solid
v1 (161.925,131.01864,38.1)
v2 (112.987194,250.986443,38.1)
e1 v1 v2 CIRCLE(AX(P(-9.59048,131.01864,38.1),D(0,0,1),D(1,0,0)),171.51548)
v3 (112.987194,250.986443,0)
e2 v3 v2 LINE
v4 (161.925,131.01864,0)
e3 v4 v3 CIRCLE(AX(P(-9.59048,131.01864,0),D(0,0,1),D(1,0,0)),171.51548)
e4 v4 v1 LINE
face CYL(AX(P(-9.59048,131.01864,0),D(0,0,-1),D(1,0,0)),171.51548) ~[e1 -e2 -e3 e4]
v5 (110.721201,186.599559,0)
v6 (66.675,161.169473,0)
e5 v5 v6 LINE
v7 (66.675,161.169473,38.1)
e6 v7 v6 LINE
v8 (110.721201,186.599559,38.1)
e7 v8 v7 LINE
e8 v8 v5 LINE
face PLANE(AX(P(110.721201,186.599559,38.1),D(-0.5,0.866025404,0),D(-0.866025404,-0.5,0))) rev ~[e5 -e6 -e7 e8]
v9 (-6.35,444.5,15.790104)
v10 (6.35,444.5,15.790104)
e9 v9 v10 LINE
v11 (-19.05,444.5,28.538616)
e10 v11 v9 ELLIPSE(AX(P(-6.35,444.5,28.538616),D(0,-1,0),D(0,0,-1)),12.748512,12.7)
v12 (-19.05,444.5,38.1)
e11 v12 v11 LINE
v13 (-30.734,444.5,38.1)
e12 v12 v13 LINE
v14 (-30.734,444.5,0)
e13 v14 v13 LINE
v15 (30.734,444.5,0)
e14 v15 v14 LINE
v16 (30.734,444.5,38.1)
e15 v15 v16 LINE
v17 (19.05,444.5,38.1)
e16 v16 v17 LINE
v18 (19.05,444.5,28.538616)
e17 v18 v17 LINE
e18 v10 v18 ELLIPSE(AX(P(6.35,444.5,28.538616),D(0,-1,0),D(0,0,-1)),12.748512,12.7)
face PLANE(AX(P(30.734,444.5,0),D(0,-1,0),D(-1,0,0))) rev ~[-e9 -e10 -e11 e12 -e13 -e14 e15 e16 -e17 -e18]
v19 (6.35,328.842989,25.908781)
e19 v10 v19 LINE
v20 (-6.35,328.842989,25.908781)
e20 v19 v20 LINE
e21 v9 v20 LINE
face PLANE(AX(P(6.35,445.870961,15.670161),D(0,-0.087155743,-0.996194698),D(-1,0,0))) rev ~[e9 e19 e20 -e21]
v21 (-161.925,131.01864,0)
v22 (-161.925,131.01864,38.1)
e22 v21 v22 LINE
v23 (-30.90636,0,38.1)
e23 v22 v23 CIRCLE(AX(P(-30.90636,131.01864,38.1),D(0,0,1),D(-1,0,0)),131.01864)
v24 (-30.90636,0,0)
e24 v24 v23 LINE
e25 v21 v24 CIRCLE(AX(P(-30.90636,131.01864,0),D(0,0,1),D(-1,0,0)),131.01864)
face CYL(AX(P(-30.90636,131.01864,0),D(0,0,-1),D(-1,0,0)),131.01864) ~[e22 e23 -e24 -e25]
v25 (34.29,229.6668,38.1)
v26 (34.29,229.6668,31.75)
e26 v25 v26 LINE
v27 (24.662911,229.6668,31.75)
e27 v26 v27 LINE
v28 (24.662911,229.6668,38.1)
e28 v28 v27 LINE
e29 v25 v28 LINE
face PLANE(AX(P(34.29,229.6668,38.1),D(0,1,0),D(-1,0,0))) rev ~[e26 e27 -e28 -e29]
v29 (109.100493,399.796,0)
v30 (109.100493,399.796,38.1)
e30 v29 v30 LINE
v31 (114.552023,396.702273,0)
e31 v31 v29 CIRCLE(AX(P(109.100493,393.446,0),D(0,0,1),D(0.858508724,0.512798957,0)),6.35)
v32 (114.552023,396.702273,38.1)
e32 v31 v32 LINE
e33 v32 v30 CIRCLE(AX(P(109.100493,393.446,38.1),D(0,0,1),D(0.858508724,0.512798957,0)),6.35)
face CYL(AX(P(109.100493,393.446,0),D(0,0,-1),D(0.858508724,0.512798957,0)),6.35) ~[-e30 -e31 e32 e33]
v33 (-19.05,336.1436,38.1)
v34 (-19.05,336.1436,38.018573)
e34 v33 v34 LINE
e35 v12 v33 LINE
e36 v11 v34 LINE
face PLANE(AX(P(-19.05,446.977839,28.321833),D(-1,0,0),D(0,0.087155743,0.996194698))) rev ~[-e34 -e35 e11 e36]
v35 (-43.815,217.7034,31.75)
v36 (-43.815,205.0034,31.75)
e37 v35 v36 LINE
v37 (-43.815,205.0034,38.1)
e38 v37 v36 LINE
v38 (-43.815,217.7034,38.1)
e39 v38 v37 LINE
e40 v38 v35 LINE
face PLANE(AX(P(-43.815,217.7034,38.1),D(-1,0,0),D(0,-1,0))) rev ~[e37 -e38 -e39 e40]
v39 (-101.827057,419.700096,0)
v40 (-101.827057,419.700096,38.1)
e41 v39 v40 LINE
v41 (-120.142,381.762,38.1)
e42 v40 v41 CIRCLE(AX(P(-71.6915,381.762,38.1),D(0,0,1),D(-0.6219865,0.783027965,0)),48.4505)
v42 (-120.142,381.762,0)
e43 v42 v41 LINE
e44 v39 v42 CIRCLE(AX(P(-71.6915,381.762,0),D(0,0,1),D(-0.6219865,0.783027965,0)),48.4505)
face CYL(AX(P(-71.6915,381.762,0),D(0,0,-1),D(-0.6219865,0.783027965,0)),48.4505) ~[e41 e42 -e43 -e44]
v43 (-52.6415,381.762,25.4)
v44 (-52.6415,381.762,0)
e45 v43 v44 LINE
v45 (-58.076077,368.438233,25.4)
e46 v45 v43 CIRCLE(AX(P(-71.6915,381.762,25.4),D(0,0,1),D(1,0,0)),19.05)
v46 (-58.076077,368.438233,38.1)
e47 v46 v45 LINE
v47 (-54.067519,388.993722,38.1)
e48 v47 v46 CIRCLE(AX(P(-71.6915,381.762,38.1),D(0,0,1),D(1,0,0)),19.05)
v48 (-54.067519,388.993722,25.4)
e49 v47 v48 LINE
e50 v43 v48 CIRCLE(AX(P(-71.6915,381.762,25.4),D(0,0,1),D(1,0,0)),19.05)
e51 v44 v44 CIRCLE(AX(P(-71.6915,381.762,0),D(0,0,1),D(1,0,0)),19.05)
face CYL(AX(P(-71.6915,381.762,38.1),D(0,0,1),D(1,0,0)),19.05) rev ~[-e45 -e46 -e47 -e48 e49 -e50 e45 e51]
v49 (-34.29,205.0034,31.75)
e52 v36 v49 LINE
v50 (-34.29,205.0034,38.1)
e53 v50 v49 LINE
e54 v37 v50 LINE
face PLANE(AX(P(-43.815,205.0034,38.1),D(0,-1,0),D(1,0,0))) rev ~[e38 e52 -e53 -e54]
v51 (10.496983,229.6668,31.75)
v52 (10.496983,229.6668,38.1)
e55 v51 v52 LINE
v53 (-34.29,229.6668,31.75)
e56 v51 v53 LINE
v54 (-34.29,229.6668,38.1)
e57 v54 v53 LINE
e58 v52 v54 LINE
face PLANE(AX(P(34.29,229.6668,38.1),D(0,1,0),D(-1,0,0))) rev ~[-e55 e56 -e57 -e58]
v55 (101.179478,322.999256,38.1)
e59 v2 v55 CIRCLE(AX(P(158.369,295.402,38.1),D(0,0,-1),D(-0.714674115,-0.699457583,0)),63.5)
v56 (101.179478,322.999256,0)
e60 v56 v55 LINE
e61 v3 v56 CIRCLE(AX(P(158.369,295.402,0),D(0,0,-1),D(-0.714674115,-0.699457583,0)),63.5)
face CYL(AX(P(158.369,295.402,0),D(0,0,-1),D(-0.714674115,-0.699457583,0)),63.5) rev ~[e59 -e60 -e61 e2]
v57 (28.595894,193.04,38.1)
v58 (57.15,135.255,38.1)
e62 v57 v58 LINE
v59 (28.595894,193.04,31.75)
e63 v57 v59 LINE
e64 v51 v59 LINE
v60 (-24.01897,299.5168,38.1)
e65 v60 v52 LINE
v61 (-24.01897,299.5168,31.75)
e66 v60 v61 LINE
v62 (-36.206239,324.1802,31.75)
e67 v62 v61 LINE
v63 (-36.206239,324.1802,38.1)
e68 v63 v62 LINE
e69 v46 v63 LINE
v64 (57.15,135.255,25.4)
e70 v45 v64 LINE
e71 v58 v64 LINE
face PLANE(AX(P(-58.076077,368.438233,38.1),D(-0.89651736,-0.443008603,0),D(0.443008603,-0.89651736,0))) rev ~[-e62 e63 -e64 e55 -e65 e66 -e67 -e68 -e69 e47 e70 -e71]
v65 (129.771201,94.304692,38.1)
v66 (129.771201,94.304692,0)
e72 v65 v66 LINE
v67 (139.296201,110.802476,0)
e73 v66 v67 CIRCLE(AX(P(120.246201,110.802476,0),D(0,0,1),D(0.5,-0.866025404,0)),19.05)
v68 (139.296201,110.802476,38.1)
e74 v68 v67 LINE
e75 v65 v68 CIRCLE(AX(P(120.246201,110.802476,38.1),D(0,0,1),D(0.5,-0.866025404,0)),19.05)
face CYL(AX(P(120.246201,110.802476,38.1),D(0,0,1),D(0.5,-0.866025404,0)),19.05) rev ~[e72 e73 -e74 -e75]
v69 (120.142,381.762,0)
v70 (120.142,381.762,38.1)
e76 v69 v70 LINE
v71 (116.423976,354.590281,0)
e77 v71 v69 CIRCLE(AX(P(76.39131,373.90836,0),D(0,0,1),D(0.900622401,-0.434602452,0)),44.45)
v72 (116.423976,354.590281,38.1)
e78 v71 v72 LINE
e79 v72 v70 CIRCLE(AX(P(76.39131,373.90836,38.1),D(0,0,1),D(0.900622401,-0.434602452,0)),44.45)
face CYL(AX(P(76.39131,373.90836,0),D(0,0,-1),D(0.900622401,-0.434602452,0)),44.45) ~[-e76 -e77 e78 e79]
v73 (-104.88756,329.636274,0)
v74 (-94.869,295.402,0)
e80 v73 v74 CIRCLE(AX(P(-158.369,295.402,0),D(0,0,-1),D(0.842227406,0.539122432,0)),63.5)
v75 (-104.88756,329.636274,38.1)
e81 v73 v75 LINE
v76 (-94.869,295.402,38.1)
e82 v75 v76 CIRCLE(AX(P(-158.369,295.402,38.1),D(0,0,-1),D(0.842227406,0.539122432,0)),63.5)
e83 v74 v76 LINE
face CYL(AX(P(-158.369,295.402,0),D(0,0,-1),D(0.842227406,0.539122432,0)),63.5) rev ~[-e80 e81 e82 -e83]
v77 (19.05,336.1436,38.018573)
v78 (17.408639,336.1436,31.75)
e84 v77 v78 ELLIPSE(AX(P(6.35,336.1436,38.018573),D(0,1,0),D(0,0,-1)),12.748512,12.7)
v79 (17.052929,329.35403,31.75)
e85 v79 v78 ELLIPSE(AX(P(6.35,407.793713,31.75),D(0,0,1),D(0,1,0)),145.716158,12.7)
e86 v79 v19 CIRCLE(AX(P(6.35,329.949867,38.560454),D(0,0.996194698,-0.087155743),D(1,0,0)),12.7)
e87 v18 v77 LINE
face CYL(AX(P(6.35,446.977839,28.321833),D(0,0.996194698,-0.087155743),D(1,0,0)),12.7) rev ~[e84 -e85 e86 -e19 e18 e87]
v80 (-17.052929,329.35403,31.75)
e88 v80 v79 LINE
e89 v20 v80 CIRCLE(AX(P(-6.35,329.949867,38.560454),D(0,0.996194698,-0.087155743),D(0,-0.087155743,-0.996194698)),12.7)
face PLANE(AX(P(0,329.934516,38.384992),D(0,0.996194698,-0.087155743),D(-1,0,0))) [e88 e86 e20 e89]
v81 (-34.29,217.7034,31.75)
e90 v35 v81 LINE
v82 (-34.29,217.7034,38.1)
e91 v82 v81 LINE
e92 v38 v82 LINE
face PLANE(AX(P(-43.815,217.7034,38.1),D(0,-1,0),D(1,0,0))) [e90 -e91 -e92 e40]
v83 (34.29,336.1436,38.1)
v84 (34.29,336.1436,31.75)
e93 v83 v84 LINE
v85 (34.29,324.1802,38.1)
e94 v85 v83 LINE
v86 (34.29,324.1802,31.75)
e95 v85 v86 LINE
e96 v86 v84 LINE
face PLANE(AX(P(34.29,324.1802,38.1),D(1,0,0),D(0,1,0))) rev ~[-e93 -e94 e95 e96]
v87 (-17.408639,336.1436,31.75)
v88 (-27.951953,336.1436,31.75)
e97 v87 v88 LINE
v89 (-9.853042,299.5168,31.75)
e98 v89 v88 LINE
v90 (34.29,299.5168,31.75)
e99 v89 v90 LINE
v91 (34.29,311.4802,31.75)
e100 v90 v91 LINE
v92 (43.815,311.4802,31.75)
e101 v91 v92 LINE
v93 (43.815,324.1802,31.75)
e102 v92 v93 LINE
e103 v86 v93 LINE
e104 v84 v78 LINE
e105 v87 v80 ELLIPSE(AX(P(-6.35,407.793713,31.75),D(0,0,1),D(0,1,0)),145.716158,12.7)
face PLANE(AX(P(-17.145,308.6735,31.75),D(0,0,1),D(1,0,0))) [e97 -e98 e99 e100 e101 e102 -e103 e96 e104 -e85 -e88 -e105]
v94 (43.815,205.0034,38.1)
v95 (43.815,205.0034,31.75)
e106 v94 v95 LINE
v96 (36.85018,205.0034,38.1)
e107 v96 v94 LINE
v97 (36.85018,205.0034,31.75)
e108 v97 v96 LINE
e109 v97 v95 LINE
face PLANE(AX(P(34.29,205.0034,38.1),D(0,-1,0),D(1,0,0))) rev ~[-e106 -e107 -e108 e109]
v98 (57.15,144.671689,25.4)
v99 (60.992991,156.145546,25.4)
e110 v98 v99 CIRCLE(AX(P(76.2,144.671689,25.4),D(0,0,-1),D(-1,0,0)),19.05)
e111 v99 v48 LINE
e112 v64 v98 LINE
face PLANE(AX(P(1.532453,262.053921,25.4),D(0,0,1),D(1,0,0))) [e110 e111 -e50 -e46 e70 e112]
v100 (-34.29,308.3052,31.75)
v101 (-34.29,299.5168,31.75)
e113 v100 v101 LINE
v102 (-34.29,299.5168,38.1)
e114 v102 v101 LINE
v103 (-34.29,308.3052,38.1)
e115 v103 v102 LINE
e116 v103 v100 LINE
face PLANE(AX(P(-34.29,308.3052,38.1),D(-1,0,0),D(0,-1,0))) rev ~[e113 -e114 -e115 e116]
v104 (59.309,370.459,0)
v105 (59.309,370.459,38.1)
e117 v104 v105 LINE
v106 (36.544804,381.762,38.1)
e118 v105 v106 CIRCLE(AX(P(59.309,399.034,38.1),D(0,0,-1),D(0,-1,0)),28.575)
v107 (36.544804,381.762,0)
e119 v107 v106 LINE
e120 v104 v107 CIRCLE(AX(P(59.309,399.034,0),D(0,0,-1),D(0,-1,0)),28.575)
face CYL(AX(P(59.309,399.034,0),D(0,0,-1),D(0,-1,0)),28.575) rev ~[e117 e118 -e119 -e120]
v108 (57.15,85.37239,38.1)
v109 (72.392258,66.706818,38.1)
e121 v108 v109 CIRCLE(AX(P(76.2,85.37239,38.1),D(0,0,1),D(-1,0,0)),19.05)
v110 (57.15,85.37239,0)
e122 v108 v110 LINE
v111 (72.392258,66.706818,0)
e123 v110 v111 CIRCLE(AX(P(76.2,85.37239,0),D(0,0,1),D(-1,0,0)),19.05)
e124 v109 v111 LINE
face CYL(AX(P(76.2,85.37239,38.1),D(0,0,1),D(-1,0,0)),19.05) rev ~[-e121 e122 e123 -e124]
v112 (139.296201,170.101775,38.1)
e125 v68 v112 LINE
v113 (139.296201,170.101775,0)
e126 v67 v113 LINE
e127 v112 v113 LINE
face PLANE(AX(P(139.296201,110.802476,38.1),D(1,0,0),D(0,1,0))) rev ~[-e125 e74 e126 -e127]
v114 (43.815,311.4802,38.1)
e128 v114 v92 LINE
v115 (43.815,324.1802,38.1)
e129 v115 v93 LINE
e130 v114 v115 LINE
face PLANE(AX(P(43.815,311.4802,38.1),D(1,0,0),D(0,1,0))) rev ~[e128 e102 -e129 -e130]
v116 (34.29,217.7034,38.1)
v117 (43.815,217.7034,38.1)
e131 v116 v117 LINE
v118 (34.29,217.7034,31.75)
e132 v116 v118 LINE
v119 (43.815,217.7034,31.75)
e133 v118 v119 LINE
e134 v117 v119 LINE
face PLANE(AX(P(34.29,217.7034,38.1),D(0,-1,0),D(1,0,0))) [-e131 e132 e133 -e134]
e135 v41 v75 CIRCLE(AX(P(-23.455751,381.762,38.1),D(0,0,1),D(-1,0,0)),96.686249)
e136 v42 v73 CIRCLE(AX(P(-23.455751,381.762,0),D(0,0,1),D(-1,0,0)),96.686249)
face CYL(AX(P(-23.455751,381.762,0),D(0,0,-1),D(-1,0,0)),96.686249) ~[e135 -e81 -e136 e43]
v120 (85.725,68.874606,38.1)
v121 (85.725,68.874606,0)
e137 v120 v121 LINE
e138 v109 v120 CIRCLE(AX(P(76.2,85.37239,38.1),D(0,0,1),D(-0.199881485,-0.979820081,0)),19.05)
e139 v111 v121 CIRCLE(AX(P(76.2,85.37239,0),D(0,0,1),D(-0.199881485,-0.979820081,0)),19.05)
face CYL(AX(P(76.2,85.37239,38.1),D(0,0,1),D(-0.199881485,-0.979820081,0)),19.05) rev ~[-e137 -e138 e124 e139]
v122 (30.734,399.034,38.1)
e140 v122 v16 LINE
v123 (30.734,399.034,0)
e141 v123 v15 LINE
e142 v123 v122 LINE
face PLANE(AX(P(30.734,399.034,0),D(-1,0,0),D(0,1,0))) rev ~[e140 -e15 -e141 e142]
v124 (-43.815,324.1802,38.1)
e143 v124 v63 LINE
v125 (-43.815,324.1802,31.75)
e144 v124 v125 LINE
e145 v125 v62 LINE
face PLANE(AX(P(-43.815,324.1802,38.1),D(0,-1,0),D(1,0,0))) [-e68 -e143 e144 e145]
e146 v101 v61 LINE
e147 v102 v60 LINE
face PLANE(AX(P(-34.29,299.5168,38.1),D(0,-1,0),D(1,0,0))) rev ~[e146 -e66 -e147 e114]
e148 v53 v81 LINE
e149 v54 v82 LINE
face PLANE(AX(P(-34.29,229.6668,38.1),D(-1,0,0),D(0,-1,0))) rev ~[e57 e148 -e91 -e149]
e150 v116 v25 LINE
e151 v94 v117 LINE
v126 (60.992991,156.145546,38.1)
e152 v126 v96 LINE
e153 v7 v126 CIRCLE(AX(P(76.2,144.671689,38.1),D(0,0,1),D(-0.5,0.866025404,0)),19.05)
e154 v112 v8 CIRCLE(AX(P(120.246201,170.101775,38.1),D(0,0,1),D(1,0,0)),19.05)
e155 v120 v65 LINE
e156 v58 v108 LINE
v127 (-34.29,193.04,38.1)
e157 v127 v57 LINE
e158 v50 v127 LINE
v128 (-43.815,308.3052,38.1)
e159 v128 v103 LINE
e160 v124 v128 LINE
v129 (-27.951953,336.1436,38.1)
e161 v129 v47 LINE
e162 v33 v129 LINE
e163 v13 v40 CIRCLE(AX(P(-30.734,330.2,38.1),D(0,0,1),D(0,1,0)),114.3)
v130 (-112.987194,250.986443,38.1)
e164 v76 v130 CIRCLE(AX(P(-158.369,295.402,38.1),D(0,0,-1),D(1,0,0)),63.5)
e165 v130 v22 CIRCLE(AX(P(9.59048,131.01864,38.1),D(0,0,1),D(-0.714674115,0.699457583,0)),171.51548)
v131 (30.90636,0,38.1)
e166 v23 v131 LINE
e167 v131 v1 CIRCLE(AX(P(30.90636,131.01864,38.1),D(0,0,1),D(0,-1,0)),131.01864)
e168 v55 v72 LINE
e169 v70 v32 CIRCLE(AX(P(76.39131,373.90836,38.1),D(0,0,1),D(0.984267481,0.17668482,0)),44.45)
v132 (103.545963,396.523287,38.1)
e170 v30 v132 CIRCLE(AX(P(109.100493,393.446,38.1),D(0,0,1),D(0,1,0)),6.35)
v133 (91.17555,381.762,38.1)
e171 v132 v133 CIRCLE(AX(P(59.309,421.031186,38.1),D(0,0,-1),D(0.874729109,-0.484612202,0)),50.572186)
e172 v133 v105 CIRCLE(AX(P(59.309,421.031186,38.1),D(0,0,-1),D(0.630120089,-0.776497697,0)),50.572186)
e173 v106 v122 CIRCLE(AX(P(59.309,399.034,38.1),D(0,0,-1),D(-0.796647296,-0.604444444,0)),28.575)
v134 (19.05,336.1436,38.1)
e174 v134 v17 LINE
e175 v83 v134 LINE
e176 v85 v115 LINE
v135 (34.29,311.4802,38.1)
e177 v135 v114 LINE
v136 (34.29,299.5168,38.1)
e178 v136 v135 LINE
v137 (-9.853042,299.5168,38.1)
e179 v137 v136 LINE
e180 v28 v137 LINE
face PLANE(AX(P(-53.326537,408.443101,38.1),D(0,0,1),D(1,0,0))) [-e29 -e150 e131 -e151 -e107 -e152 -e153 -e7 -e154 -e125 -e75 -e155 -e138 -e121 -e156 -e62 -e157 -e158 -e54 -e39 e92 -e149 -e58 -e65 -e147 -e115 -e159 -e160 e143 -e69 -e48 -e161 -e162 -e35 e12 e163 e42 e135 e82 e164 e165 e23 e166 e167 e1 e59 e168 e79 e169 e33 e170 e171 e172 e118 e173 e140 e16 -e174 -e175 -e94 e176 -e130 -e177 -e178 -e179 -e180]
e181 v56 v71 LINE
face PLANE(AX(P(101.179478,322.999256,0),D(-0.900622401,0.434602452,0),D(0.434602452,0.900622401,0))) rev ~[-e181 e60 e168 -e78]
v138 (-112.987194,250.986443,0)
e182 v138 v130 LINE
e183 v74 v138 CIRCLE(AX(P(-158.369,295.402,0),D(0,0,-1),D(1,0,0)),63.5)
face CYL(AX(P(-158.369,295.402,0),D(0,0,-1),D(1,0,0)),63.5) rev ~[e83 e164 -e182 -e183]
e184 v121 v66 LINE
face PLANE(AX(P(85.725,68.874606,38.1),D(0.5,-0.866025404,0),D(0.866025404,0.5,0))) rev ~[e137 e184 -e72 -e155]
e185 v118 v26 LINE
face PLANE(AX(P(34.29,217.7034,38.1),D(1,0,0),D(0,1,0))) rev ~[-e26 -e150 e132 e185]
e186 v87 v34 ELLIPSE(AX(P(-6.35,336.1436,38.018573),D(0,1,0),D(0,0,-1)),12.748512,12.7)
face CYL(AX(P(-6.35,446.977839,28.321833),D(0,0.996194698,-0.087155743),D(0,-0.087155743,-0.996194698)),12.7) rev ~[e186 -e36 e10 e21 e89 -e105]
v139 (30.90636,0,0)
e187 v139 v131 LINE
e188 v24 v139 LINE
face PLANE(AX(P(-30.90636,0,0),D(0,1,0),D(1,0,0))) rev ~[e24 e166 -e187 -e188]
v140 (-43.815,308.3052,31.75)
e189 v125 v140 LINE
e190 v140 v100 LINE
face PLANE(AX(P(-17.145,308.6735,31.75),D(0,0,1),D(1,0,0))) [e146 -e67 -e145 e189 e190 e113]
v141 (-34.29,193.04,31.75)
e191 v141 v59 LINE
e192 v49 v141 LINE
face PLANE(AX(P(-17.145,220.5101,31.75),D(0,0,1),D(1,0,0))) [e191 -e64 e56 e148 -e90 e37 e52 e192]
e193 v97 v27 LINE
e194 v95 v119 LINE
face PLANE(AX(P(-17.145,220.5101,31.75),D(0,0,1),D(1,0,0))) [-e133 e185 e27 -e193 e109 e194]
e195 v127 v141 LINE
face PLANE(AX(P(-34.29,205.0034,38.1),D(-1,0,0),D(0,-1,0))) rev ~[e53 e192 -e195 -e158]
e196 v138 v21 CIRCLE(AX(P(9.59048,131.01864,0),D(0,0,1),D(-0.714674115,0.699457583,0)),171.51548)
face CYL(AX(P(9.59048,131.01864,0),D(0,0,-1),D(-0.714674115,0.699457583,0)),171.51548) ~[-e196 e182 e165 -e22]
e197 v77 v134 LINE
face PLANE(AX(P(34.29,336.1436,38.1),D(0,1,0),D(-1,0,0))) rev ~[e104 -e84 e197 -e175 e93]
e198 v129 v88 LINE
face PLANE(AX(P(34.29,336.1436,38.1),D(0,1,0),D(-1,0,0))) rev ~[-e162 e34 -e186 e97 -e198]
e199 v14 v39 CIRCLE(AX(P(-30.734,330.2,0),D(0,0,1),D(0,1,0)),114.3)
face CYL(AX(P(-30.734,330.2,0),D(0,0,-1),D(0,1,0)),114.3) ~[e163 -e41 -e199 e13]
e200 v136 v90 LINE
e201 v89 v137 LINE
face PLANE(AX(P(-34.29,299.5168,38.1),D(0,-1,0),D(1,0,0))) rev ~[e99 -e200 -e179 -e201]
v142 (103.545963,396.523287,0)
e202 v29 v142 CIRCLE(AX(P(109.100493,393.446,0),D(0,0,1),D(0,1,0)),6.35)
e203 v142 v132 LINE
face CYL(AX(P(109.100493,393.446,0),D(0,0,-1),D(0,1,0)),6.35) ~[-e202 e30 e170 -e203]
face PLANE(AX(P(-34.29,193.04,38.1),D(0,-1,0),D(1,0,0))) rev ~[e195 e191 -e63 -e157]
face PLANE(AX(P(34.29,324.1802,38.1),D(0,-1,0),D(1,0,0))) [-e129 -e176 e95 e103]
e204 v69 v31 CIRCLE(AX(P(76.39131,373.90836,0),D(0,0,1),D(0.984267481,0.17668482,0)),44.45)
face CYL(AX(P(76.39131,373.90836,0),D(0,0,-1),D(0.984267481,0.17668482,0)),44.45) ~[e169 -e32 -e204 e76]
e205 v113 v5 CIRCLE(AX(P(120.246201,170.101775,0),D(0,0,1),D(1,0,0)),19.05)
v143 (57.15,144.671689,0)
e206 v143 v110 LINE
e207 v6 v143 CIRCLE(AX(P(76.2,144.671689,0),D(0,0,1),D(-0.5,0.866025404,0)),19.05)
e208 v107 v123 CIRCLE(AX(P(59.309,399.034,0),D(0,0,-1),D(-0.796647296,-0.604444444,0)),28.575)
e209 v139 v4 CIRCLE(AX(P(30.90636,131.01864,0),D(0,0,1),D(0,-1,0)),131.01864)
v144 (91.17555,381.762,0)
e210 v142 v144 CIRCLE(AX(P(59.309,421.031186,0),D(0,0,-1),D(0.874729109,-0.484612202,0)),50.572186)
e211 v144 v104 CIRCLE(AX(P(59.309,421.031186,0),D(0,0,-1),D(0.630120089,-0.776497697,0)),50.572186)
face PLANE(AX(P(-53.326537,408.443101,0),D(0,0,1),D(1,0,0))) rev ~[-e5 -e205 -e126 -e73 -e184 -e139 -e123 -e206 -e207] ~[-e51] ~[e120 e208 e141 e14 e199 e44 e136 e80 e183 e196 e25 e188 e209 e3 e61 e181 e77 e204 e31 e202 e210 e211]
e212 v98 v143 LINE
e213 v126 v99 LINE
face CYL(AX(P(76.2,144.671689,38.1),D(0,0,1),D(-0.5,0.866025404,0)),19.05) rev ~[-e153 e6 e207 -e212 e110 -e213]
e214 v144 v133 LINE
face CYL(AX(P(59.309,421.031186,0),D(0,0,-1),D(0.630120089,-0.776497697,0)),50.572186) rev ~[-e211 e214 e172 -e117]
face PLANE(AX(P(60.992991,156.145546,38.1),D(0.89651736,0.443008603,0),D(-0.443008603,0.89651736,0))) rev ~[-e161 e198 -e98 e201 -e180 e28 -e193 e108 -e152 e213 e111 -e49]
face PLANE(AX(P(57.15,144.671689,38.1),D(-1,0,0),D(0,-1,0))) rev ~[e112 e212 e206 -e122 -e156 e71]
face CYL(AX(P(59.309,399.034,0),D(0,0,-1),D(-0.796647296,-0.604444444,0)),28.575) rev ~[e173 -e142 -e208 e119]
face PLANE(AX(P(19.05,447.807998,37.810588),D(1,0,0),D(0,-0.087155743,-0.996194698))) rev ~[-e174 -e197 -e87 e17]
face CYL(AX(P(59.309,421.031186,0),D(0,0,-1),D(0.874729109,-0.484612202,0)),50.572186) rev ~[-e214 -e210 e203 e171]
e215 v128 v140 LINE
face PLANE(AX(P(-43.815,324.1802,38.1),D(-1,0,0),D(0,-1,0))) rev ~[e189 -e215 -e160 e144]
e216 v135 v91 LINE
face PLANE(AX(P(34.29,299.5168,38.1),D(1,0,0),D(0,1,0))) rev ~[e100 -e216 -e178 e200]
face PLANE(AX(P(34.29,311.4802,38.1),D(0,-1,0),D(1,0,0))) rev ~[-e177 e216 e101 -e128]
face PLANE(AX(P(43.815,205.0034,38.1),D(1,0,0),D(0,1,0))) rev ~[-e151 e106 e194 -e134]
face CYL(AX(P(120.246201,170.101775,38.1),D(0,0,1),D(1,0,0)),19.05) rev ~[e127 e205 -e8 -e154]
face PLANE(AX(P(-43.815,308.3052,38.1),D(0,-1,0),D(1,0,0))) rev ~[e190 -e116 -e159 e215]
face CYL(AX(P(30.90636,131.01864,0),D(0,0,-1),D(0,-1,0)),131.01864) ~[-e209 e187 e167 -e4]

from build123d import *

# Parameters (mm, degrees)
F2_DEPTH  = 38.1
F4_R      = 19.05
F5_DEPTH  = 38.101
F11_DEPTH = 117.475
F12_W     = 9.525
F12_H     = 6.35
F13_DEPTH = 6.35
F15_DEPTH = 12.7


# Not quite as in the source:
# - a feature of the source that left no trace in its solid (it failed there, or was rolled back) is left out


with BuildPart() as f2:
    # F1 (on Top) → F2 (new body)
    with BuildSketch(Plane.XY):
        with BuildLine():
            Line((-120.142, 381.762), (0, 381.762))
            Line((0, 381.762), (0, 444.5))
            Line((0, 444.5), (-30.734, 444.5))
            ThreePointArc((-30.734, 444.5), (-68.3812374672, 438.1220807393), (-101.8270568949, 419.700096432))
            ThreePointArc((-101.8270568949, 419.700096432), (-115.3236770577, 402.8258096141), (-120.142, 381.762))
        make_face()
        with BuildLine():
            Line((0, 444.5), (0, 381.762))
            Line((0, 381.762), (36.5448035283, 381.762))
            ThreePointArc((36.5448035283, 381.762), (32.2256329717, 389.9223670283), (30.734, 399.034))
            Line((30.734, 399.034), (30.734, 444.5))
            Line((30.734, 444.5), (0, 444.5))
        make_face()
        with BuildLine():
            Line((0, 381.762), (0, 295.402))
            Line((0, 295.402), (94.869, 295.402))
            ThreePointArc((94.869, 295.402), (96.466719449, 309.5567752573), (101.1794775617, 322.9992557201))
            Line((101.1794775617, 322.9992557201), (116.4239761752, 354.5902807248))
            ThreePointArc((116.4239761752, 354.5902807248), (120.430931673, 367.882227955), (120.142, 381.762))
            Line((120.142, 381.762), (91.175550227, 381.762))
            ThreePointArc((91.175550227, 381.762), (76.2148779155, 373.3684407202), (59.309, 370.459))
            ThreePointArc((59.309, 370.459), (46.6010649789, 373.440270055), (36.5448035283, 381.762))
            Line((36.5448035283, 381.762), (0, 381.762))
        make_face()
        with BuildLine():
            ThreePointArc((103.5459630182, 396.5232874828), (98.0699350262, 388.5483304334), (91.175550227, 381.762))
            Line((91.175550227, 381.762), (120.142, 381.762))
            ThreePointArc((120.142, 381.762), (118.0226976621, 389.4849479409), (114.552023257, 396.7022733785))
            ThreePointArc((114.552023257, 396.7022733785), (112.2345927331, 398.9686730826), (109.1004928586, 399.796))
            ThreePointArc((109.1004928586, 399.796), (105.8770068198, 398.9169814255), (103.5459630182, 396.5232874828))
        make_face()
        with BuildLine():
            Line((94.869, 295.402), (0, 295.402))
            Line((0, 295.402), (0, 0))
            Line((0, 0), (30.906359714, 0))
            ThreePointArc((30.906359714, 0), (123.5505287221, 38.3744712779), (161.925, 131.018640286))
            ThreePointArc((161.925, 131.018640286), (149.2199863218, 195.80132063), (112.9871937272, 250.9864434976))
            ThreePointArc((112.9871937272, 250.9864434976), (99.5727641582, 271.4175748279), (94.869, 295.402))
        make_face()
        with BuildLine():
            Line((0, 295.402), (-94.869, 295.402))
            ThreePointArc((-94.869, 295.402), (-99.5727641582, 271.4175748279), (-112.9871937272, 250.9864434976))
            ThreePointArc((-112.9871937272, 250.9864434976), (-149.2199863218, 195.80132063), (-161.925, 131.018640286))
            ThreePointArc((-161.925, 131.018640286), (-123.5505287221, 38.3744712779), (-30.906359714, 0))
            Line((-30.906359714, 0), (0, 0))
            Line((0, 0), (0, 295.402))
        make_face()
        with BuildLine():
            ThreePointArc((-104.887559724, 329.6362744337), (-97.4250853837, 313.2370573657), (-94.869, 295.402))
            Line((-94.869, 295.402), (0, 295.402))
            Line((0, 295.402), (0, 381.762))
            Line((0, 381.762), (-120.142, 381.762))
            ThreePointArc((-120.142, 381.762), (-116.2500581541, 354.6060190108), (-104.887559724, 329.6362744337))
        make_face()
    extrude(amount=F2_DEPTH)

    # F4 (on face) → F5 (cut, through all)
    with BuildSketch(Plane.XY.offset(38.1)):
        with Locations((-71.6915, 381.762)):
            Circle(F4_R)
        with BuildLine():
            Line((139.2962010965, 110.8024764079), (139.2962010965, 170.1017752607))
            ThreePointArc((139.2962010965, 170.1017752607), (129.7712010965, 186.5995592028), (110.7212010965, 186.5995592028))
            Line((110.7212010965, 186.5995592028), (66.675, 161.169473143))
            ThreePointArc((66.675, 161.169473143), (59.7022160579, 154.1966892009), (57.15, 144.6716892009))
            Line((57.15, 144.6716892009), (57.15, 108.5037669007))
            Line((57.15, 108.5037669007), (69.5417475728, 132.0304736397))
            ThreePointArc((69.5417475728, 132.0304736397), (65.9030700587, 154.5765309479), (88.5733379566, 151.8154392009))
            Line((88.5733379566, 151.8154392009), (107.8728631399, 162.9580252607))
            ThreePointArc((107.8728631399, 162.9580252607), (116.5483239896, 183.9024405039), (134.5337010965, 170.1017752607))
            ThreePointArc((134.5337010965, 170.1017752607), (130.3489892327, 159.9989871245), (120.2462010965, 155.8142752607))
            Line((120.2462010965, 155.8142752607), (120.2462010965, 125.0899764079))
            ThreePointArc((120.2462010965, 125.0899764079), (130.3489892327, 120.9052645441), (134.5337010965, 110.8024764079))
            ThreePointArc((134.5337010965, 110.8024764079), (125.4430565732, 97.4936316269), (109.7392514861, 101.1207066247))
            Line((109.7392514861, 101.1207066247), (90.3263274862, 83.23240717))
            ThreePointArc((90.3263274862, 83.23240717), (85.8817697832, 74.8654407377), (77.1799912803, 71.1185391723))
            Line((77.1799912803, 71.1185391723), (72.3922577123, 66.7068177967))
            ThreePointArc((72.3922577123, 66.7068177967), (79.2572186381, 66.5693077763), (85.725, 68.874606406))
            Line((85.725, 68.874606406), (129.7712010965, 94.3046924658))
            ThreePointArc((129.7712010965, 94.3046924658), (136.7439850386, 101.2774764079), (139.2962010965, 110.8024764079))
        make_face()
        with BuildLine():
            Line((69.5417475728, 132.0304736397), (57.15, 108.5037669007))
            Line((57.15, 108.5037669007), (57.15, 85.3723903481))
            ThreePointArc((57.15, 85.3723903481), (61.4446621425, 73.3232200567), (72.3922577123, 66.7068177967))
            Line((72.3922577123, 66.7068177967), (77.1799912803, 71.1185391723))
            ThreePointArc((77.1799912803, 71.1185391723), (85.8817697832, 74.8654407377), (90.3263274862, 83.23240717))
            Line((90.3263274862, 83.23240717), (109.7392514861, 101.1207066247))
            ThreePointArc((109.7392514861, 101.1207066247), (125.4430565732, 97.4936316269), (134.5337010965, 110.8024764079))
            ThreePointArc((134.5337010965, 110.8024764079), (130.3489892327, 120.9052645441), (120.2462010965, 125.0899764079))
            Line((120.2462010965, 125.0899764079), (120.2462010965, 155.8142752607))
            ThreePointArc((120.2462010965, 155.8142752607), (130.3489892327, 159.9989871245), (134.5337010965, 170.1017752607))
            ThreePointArc((134.5337010965, 170.1017752607), (116.5483239896, 183.9024405039), (107.8728631399, 162.9580252607))
            Line((107.8728631399, 162.9580252607), (88.5733379566, 151.8154392009))
            ThreePointArc((88.5733379566, 151.8154392009), (65.9030700587, 154.5765309479), (69.5417475728, 132.0304736397))
        make_face()
    extrude(amount=-F5_DEPTH, mode=Mode.SUBTRACT)

    # F10 (on face) → F11 (cut)
    with BuildSketch(Plane(origin=(0, 441.123523107, -38.5933074865), x_dir=(-1, 0, 0), z_dir=(0, 0.9961946981, -0.0871557427))):
        with BuildLine():
            Line((19.05, 76.6957456486), (-19.05, 76.6957456486))
            Line((-19.05, 76.6957456486), (-19.05, 67.1707456486))
            ThreePointArc((-19.05, 67.1707456486), (-15.3302561211, 58.1904895276), (-6.35, 54.4707456486))
            Line((-6.35, 54.4707456486), (0, 54.4707456486))
            Line((0, 54.4707456486), (6.35, 54.4707456486))
            ThreePointArc((6.35, 54.4707456486), (15.3302561211, 58.1904895276), (19.05, 67.1707456486))
            Line((19.05, 67.1707456486), (19.05, 76.6957456486))
        make_face()
    extrude(amount=-F11_DEPTH, mode=Mode.SUBTRACT)

    # F12 (on face) → F13 (cut)
    with BuildSketch(Plane.XY.offset(38.1)):
        Polygon((-34.29, 299.5168), (0, 299.5168), (0, 317.8302), (-34.29, 317.8302), (-34.29, 311.4802), (-34.29, 308.3052), align=None)
        Polygon((0, 317.8302), (0, 299.5168), (34.29, 299.5168), (34.29, 311.4802), (34.29, 317.8302), align=None)
        Polygon((0, 229.6668), (-34.29, 229.6668), (-34.29, 217.7034), (-34.29, 211.3534), (0, 211.3534), align=None)
        Polygon((34.29, 229.6668), (0, 229.6668), (0, 211.3534), (34.29, 211.3534), (34.29, 217.7034), align=None)
        with Locations((-39.0525, 214.5284)):
            Rectangle(F12_W, F12_H)
        Polygon((34.29, 211.3534), (0, 211.3534), (0, 193.04), (34.29, 193.04), (34.29, 205.0034), align=None)
        Polygon((0, 193.04), (0, 211.3534), (-34.29, 211.3534), (-34.29, 205.0034), (-34.29, 193.04), align=None)
        with Locations((-39.0525, 208.1784)):
            Rectangle(F12_W, F12_H)
        with Locations((39.0525, 214.5284)):
            Rectangle(F12_W, F12_H)
        Polygon((0, 336.1436), (0, 317.8302), (34.29, 317.8302), (34.29, 324.1802), (34.29, 336.1436), align=None)
        Polygon((-34.29, 317.8302), (0, 317.8302), (0, 336.1436), (-34.29, 336.1436), (-34.29, 324.1802), align=None)
        with Locations((39.0525, 208.1784)):
            Rectangle(F12_W, F12_H)
        Polygon((-43.815, 308.3052), (-34.29, 308.3052), (-34.29, 311.4802), (-34.29, 317.8302), (-43.815, 317.8302), (-43.815, 311.4802), align=None)
        with Locations((39.0525, 314.6552)):
            Rectangle(F12_W, F12_H)
        with Locations((39.0525, 321.0052)):
            Rectangle(F12_W, F12_H)
        with Locations((-39.0525, 321.0052)):
            Rectangle(F12_W, F12_H)
    extrude(amount=-F13_DEPTH, mode=Mode.SUBTRACT)

    # F14 (on face) → F15 (cut)
    with BuildSketch(Plane.XY.offset(38.1)):
        with BuildLine():
            Line((-54.0675192427, 388.9937219434), (-58.0760770823, 368.4382333114))
            Line((-58.0760770823, 368.4382333114), (57.15, 135.255))
            Line((57.15, 135.255), (57.15, 144.6716892009))
            ThreePointArc((57.15, 144.6716892009), (58.1362792436, 150.7218538627), (60.9929913317, 156.1455458918))
            Line((60.9929913317, 156.1455458918), (-54.0675192427, 388.9937219434))
        make_face()
    extrude(amount=-F15_DEPTH, mode=Mode.SUBTRACT)


solid = f2.part
